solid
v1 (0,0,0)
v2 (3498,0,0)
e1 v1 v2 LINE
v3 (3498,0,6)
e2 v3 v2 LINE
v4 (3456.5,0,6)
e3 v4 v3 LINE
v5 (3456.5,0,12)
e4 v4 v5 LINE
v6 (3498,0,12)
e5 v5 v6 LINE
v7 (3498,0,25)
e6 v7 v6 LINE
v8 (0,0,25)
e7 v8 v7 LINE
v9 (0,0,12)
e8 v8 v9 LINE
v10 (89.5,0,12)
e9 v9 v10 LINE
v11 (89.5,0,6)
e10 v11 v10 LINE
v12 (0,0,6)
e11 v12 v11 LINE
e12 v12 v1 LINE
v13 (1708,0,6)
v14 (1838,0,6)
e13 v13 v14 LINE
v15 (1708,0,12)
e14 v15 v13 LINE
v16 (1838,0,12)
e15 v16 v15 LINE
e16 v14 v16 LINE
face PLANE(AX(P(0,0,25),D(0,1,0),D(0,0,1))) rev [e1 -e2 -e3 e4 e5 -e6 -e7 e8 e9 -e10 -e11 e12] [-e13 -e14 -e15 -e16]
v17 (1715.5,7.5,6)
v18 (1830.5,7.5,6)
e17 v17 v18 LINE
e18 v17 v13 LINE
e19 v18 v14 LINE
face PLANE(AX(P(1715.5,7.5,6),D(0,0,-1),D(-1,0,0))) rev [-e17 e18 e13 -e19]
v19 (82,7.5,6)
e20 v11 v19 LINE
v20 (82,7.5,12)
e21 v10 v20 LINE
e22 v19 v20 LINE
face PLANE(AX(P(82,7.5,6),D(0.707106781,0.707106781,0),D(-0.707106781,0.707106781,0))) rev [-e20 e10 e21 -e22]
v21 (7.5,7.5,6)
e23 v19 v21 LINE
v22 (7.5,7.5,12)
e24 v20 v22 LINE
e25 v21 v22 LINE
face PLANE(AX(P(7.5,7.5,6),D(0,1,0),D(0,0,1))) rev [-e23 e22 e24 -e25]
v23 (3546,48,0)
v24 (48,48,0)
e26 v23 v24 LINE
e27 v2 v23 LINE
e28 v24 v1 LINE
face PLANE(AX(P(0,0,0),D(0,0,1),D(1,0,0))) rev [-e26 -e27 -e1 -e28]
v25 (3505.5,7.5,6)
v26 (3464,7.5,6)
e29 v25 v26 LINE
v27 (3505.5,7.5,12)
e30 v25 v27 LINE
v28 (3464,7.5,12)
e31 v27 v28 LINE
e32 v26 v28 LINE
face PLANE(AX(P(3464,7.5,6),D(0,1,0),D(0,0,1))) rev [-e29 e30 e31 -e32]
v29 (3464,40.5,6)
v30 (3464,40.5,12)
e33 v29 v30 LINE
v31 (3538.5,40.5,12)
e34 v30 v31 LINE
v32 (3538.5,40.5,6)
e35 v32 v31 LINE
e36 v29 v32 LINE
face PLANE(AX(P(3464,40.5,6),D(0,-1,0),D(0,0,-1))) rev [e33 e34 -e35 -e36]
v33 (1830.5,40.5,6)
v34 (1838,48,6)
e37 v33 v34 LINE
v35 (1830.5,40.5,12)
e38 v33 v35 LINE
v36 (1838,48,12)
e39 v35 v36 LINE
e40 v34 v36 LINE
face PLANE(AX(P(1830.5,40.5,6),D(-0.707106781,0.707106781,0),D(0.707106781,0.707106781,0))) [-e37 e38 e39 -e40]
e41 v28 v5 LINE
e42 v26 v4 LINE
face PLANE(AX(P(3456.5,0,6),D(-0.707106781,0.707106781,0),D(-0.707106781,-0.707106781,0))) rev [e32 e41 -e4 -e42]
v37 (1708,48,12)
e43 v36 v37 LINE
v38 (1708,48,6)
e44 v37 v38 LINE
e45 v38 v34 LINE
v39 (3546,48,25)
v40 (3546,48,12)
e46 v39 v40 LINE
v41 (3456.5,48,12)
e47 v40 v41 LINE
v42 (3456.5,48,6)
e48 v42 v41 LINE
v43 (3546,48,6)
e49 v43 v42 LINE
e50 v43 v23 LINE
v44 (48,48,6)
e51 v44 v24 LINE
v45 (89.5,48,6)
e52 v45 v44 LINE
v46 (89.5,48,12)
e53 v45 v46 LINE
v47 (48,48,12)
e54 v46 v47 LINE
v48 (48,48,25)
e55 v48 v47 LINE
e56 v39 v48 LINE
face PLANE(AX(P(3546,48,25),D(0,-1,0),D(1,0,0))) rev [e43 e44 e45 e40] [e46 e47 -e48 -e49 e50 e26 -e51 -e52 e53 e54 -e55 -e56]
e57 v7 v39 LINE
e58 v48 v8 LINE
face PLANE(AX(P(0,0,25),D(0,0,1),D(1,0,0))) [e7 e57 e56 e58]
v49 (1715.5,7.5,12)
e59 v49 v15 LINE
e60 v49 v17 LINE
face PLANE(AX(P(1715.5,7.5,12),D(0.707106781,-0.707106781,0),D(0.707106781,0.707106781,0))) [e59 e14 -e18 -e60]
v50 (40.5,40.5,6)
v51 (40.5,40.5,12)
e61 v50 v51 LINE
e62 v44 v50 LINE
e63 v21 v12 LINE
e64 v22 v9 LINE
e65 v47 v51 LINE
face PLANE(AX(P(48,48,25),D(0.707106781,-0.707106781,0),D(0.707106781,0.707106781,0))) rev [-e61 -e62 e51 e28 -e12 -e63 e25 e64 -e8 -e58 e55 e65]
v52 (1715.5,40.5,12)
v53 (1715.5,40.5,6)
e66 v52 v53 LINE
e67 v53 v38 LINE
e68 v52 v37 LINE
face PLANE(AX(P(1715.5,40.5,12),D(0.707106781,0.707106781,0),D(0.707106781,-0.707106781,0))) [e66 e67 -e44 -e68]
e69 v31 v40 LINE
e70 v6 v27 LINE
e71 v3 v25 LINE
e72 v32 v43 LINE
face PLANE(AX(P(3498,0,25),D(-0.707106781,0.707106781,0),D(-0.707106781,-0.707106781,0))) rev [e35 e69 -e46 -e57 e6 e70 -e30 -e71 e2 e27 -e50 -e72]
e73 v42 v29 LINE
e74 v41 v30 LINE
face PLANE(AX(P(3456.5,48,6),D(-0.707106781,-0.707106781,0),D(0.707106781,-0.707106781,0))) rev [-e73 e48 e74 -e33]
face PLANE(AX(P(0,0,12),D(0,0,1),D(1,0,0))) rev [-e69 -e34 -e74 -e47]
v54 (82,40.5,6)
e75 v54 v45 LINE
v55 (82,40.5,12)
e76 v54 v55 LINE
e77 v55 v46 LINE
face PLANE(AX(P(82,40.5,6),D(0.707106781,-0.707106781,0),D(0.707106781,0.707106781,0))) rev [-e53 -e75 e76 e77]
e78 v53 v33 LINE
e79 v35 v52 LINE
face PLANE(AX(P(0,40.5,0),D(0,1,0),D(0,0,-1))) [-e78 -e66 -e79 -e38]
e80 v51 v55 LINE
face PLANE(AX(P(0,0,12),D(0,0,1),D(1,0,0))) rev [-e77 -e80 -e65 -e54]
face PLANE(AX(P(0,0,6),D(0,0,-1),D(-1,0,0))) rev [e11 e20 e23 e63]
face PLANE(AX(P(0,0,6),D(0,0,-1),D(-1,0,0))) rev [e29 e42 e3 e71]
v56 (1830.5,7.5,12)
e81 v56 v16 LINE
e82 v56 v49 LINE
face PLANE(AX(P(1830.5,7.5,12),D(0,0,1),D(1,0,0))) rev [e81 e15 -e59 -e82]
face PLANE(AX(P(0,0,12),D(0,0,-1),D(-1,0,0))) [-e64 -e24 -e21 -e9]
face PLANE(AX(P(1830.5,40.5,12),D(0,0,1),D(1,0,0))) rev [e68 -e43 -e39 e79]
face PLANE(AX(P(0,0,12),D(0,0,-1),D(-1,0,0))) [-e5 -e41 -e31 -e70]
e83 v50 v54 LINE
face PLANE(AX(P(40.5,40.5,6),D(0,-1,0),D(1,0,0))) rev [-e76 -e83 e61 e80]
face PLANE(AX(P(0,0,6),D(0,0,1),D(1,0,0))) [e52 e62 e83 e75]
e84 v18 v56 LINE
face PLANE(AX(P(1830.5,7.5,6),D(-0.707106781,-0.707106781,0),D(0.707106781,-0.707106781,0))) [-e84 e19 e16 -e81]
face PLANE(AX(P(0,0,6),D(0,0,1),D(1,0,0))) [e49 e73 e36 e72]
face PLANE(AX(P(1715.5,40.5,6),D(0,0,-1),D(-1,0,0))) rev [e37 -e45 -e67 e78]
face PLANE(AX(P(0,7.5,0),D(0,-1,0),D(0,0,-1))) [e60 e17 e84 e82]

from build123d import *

# Parameters (mm, degrees)
EXTRUDE_1_DEPTH     = 25
SKETCH_2_W          = 115
SKETCH_2_H          = 6
CUT_EXTRUDE_1_DEPTH = 7.5
DRAFT_1_ANGLE       = 45
MIRROR_START        = 6
MIRROR_1_DEPTH      = 6
CUT_EXTRUDE_START   = -13
CUT_EXTRUDE_2_DEPTH = 6


# Read off the part's stored shape, not the designer's step: 镜向1
with BuildPart() as part:
    # 草图1 → 凸台-拉伸1 (new body)
    with BuildSketch(Plane.XY):
        Polygon((48, 48), (0, 0), (3498, 0), (3546, 48), align=None)
    extrude(amount=EXTRUDE_1_DEPTH)

    # 草图2 → 切除-拉伸1 (cut)
    with BuildSketch(Plane.XZ):
        with Locations((1773, 9)):
            Rectangle(SKETCH_2_W, SKETCH_2_H)
    extrude(amount=-CUT_EXTRUDE_1_DEPTH, mode=Mode.SUBTRACT)

    # 拔模1
    draft_1_faces = [part.faces().sort_by_distance(p)[0] for p in [
        (1830.5, 3.75, 9),
        (1715.5, 3.75, 9),
    ]]
    draft(draft_1_faces, Plane(origin=(0, 7.5, 0), x_dir=(0, 0, -1), z_dir=(0, -1, 0)), DRAFT_1_ANGLE)

    # 镜向1 outline → 镜向1 (cut)
    with BuildSketch(Plane.XY.offset(MIRROR_START)):
        Polygon((1708, 48), (1715.5, 40.5), (1830.5, 40.5), (1838, 48), align=None)
    extrude(amount=MIRROR_1_DEPTH, mode=Mode.SUBTRACT)

    # 草图3 → 切除-拉伸2 (cut)
    with BuildSketch(Plane.XY.offset(25).offset(CUT_EXTRUDE_START)):
        Polygon((3456.5, 48), (3464, 40.5), (3538.5, 40.5), (3546, 48), align=None)
        Polygon((3456.5, 0), (3464, 7.5), (3505.5, 7.5), (3498, 0), align=None)
        Polygon((48, 48), (40.5, 40.5), (82, 40.5), (89.5, 48), align=None)
        Polygon((0, 0), (7.5, 7.5), (82, 7.5), (89.5, 0), align=None)
    extrude(amount=-CUT_EXTRUDE_2_DEPTH, mode=Mode.SUBTRACT)


solid = part.part
